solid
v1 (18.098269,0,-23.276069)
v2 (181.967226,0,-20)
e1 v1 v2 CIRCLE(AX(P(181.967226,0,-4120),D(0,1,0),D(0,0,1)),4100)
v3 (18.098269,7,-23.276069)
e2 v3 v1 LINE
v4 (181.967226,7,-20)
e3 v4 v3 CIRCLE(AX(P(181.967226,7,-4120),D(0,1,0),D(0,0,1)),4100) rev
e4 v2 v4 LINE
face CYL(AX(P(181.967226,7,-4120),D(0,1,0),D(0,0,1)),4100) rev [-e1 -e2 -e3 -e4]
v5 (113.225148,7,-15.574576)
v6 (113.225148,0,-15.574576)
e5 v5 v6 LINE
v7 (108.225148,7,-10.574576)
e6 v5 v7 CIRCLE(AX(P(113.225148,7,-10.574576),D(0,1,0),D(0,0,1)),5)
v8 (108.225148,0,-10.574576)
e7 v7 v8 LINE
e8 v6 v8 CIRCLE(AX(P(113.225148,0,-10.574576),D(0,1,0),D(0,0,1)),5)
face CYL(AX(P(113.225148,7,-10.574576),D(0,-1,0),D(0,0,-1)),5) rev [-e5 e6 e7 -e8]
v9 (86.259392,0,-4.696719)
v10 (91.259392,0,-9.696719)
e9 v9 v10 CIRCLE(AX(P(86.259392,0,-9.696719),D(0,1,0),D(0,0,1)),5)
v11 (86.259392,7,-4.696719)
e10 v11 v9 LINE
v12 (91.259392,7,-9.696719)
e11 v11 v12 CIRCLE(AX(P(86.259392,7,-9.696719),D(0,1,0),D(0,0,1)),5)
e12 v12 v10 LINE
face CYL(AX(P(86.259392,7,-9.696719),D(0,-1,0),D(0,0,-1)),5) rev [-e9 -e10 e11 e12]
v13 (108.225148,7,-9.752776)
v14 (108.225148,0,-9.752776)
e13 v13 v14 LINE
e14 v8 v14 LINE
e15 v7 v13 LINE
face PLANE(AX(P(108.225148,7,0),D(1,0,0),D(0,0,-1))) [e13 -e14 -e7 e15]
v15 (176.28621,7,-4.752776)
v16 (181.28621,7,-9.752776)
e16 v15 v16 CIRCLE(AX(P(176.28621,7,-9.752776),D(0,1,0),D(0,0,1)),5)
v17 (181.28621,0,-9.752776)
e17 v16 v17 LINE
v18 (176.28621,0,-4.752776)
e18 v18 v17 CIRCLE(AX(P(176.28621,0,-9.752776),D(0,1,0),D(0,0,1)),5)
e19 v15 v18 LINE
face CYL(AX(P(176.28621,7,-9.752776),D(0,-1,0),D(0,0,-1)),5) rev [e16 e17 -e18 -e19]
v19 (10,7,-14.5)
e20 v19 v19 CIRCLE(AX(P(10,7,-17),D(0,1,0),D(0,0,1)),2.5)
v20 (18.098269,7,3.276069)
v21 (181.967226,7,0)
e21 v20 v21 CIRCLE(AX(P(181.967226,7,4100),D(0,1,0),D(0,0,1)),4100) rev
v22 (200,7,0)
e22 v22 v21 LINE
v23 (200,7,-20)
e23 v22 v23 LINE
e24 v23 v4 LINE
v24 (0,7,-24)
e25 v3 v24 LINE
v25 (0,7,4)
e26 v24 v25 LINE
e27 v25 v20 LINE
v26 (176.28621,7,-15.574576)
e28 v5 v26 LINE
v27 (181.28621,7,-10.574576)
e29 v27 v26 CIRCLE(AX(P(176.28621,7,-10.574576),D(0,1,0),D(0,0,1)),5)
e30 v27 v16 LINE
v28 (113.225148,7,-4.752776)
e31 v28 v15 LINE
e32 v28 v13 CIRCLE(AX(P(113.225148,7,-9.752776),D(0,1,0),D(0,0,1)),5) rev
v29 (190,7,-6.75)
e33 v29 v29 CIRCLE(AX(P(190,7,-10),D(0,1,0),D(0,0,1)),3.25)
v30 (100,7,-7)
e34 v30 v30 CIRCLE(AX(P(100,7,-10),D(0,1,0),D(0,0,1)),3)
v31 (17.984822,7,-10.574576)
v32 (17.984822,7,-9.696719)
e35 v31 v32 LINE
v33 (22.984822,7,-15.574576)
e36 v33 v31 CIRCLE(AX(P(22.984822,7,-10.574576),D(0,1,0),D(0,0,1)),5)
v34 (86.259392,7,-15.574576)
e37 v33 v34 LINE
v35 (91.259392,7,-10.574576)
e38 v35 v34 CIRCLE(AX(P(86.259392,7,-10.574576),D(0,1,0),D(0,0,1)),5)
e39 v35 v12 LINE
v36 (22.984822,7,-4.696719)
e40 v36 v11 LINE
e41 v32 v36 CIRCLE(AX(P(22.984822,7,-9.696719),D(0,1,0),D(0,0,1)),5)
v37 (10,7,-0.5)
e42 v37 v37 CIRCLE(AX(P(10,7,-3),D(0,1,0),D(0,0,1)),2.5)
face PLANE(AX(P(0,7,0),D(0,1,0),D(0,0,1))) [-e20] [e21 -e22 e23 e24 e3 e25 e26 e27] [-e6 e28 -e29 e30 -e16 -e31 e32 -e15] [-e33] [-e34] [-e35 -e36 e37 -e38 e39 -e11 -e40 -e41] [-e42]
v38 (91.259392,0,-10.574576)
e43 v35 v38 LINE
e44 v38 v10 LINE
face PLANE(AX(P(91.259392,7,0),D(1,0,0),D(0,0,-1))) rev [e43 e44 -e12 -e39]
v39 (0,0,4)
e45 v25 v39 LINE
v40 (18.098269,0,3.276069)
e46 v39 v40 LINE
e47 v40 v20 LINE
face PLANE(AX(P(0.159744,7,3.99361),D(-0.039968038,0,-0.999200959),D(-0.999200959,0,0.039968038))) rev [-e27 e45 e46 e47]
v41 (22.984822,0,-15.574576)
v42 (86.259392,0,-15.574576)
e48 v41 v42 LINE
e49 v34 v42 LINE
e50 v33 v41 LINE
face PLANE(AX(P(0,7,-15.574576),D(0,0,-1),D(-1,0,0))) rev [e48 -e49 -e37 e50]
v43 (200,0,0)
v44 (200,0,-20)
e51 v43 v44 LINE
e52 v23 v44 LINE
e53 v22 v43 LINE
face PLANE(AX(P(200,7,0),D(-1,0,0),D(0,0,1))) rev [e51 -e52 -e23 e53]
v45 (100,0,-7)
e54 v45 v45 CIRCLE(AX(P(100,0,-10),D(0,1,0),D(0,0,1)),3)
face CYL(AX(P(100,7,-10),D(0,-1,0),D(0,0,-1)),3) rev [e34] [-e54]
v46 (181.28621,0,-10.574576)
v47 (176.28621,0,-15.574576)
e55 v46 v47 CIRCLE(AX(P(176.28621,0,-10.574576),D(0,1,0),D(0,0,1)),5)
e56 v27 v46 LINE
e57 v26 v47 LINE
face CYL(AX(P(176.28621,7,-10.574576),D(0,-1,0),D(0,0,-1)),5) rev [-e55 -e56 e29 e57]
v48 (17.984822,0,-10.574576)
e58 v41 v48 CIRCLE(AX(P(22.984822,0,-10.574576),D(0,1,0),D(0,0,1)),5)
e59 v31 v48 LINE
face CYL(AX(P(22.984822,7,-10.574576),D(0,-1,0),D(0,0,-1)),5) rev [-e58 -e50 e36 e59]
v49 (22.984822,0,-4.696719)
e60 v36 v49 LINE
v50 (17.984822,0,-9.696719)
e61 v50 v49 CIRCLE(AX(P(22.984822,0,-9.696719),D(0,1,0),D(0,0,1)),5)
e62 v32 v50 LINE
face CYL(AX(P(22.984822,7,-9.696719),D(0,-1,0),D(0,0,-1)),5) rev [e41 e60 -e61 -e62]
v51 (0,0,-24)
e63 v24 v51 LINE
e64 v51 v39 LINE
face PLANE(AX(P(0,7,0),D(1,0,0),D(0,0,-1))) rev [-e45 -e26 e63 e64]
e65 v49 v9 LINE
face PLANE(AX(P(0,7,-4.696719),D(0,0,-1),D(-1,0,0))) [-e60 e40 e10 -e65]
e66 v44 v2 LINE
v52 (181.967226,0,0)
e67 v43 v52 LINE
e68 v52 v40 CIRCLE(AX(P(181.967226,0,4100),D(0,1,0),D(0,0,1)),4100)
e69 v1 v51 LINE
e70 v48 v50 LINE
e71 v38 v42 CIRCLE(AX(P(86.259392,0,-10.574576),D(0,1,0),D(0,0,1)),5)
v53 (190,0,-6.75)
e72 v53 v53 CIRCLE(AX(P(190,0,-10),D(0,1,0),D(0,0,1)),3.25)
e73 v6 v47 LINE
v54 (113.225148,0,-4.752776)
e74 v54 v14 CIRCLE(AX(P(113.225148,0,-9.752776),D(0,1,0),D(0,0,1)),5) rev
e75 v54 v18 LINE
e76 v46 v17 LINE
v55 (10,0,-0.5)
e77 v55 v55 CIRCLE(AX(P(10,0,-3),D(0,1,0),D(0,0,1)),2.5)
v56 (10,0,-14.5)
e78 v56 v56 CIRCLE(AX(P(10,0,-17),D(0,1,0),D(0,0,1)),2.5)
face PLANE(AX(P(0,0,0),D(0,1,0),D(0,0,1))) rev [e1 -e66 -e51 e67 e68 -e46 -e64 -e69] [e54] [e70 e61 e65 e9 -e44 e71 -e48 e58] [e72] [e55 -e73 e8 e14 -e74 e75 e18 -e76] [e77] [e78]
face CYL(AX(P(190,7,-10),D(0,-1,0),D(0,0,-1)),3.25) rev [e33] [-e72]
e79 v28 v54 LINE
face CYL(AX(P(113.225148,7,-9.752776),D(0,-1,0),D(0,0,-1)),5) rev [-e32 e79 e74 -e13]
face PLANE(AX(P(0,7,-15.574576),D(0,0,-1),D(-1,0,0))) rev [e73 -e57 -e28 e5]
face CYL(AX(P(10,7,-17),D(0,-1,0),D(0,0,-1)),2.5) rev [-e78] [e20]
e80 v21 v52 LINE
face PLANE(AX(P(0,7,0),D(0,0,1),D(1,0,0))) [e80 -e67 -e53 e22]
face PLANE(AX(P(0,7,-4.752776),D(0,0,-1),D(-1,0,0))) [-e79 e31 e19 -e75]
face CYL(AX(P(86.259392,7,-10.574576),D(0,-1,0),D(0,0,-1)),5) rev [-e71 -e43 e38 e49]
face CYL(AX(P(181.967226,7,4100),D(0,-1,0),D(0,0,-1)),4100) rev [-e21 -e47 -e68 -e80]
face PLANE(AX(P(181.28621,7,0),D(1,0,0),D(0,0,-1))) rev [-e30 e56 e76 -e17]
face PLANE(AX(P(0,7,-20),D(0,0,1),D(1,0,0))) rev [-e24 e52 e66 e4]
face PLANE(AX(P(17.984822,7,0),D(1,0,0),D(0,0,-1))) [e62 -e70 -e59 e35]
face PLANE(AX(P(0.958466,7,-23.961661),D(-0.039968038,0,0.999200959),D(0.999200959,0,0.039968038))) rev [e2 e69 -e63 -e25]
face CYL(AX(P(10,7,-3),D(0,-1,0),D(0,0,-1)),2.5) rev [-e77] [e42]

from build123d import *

# Parameters (mm, degrees)
SZKIC1_R                    = 3
SZKIC1_R_2                  = 3.25
SZKIC1_R_3                  = 2.5
DODANIE_WYCI_GNI_CIE1_DEPTH = 7
ZAOKR_GLENIE1_R             = 4100


with BuildPart() as part:
    # Szkic1 → Dodanie-wyciągnięcie1 (new body)
    with BuildSketch(Plane(origin=(0, 0, 0), x_dir=(1, 0, 0), z_dir=(0, 1, 0))):
        Polygon((200, 0), (200, 20), (100, 20), (0, 24), (0, -4), (100, 0), align=None)
        with Locations(Location((100, 10, 0), (0, 0, 270))):
            Circle(SZKIC1_R, mode=Mode.SUBTRACT)
        with Locations(Location((190, 10, 0), (0, 0, 270))):
            Circle(SZKIC1_R_2, mode=Mode.SUBTRACT)
        with Locations(Location((10, 17, 0), (0, 0, 270))):
            Circle(SZKIC1_R_3, mode=Mode.SUBTRACT)
        with Locations(Location((10, 3, 0), (0, 0, 270))):
            Circle(SZKIC1_R_3, mode=Mode.SUBTRACT)
        with BuildLine():
            Line((22.984822323, 15.57457628), (86.25939238, 15.57457628))
            ThreePointArc((86.25939238, 15.57457628), (89.794926286, 14.110110186), (91.25939238, 10.57457628))
            Line((91.25939238, 10.57457628), (91.25939238, 9.696719379))
            ThreePointArc((91.25939238, 9.696719379), (89.794926286, 6.161185473), (86.25939238, 4.696719379))
            Line((86.25939238, 4.696719379), (22.984822323, 4.696719379))
            ThreePointArc((22.984822323, 4.696719379), (19.449288417, 6.161185473), (17.984822323, 9.696719379))
            Line((17.984822323, 9.696719379), (17.984822323, 10.57457628))
            ThreePointArc((17.984822323, 10.57457628), (19.449288417, 14.110110186), (22.984822323, 15.57457628))
        make_face(mode=Mode.SUBTRACT)
        with BuildLine():
            Line((113.225148066, 15.57457628), (176.286209663, 15.57457628))
            ThreePointArc((176.286209663, 15.57457628), (179.821743569, 14.110110186), (181.286209663, 10.57457628))
            Line((181.286209663, 10.57457628), (181.286209663, 9.752776346))
            ThreePointArc((181.286209663, 9.752776346), (179.821743569, 6.21724244), (176.286209663, 4.752776346))
            Line((176.286209663, 4.752776346), (113.225148066, 4.752776346))
            ThreePointArc((113.225148066, 4.752776346), (109.68961416, 6.21724244), (108.225148066, 9.752776346))
            Line((108.225148066, 9.752776346), (108.225148066, 10.57457628))
            ThreePointArc((108.225148066, 10.57457628), (109.68961416, 14.110110186), (113.225148066, 15.57457628))
        make_face(mode=Mode.SUBTRACT)
    extrude(amount=DODANIE_WYCI_GNI_CIE1_DEPTH)

    # Zaokrąglenie1
    # the kernel refuses this fillet: 4100 mm, written as the material it adds along each edge
    with BuildSketch(Plane(origin=(100, 0, -20), x_dir=(1, 0, 0), z_dir=(0, 1, 0)), Plane(origin=(100, 0, 0), x_dir=(-0.9992009587217893, 0, 0.03996803834887583), z_dir=(0, 1, 0))) as zaokr_glenie1_piece_1:
        with BuildLine():
            CenterArc((ZAOKR_GLENIE1_R * 0.0199920063936, ZAOKR_GLENIE1_R), ZAOKR_GLENIE1_R, 267.709389957, 2.290610043)
            Line((-ZAOKR_GLENIE1_R * 0.0199760319553, ZAOKR_GLENIE1_R * 0.000799041278211), (0, 0))
            Line((0, 0), (ZAOKR_GLENIE1_R * 0.0199920063936, 0))
        make_face()
    extrude(amount=7)


solid = part.part
